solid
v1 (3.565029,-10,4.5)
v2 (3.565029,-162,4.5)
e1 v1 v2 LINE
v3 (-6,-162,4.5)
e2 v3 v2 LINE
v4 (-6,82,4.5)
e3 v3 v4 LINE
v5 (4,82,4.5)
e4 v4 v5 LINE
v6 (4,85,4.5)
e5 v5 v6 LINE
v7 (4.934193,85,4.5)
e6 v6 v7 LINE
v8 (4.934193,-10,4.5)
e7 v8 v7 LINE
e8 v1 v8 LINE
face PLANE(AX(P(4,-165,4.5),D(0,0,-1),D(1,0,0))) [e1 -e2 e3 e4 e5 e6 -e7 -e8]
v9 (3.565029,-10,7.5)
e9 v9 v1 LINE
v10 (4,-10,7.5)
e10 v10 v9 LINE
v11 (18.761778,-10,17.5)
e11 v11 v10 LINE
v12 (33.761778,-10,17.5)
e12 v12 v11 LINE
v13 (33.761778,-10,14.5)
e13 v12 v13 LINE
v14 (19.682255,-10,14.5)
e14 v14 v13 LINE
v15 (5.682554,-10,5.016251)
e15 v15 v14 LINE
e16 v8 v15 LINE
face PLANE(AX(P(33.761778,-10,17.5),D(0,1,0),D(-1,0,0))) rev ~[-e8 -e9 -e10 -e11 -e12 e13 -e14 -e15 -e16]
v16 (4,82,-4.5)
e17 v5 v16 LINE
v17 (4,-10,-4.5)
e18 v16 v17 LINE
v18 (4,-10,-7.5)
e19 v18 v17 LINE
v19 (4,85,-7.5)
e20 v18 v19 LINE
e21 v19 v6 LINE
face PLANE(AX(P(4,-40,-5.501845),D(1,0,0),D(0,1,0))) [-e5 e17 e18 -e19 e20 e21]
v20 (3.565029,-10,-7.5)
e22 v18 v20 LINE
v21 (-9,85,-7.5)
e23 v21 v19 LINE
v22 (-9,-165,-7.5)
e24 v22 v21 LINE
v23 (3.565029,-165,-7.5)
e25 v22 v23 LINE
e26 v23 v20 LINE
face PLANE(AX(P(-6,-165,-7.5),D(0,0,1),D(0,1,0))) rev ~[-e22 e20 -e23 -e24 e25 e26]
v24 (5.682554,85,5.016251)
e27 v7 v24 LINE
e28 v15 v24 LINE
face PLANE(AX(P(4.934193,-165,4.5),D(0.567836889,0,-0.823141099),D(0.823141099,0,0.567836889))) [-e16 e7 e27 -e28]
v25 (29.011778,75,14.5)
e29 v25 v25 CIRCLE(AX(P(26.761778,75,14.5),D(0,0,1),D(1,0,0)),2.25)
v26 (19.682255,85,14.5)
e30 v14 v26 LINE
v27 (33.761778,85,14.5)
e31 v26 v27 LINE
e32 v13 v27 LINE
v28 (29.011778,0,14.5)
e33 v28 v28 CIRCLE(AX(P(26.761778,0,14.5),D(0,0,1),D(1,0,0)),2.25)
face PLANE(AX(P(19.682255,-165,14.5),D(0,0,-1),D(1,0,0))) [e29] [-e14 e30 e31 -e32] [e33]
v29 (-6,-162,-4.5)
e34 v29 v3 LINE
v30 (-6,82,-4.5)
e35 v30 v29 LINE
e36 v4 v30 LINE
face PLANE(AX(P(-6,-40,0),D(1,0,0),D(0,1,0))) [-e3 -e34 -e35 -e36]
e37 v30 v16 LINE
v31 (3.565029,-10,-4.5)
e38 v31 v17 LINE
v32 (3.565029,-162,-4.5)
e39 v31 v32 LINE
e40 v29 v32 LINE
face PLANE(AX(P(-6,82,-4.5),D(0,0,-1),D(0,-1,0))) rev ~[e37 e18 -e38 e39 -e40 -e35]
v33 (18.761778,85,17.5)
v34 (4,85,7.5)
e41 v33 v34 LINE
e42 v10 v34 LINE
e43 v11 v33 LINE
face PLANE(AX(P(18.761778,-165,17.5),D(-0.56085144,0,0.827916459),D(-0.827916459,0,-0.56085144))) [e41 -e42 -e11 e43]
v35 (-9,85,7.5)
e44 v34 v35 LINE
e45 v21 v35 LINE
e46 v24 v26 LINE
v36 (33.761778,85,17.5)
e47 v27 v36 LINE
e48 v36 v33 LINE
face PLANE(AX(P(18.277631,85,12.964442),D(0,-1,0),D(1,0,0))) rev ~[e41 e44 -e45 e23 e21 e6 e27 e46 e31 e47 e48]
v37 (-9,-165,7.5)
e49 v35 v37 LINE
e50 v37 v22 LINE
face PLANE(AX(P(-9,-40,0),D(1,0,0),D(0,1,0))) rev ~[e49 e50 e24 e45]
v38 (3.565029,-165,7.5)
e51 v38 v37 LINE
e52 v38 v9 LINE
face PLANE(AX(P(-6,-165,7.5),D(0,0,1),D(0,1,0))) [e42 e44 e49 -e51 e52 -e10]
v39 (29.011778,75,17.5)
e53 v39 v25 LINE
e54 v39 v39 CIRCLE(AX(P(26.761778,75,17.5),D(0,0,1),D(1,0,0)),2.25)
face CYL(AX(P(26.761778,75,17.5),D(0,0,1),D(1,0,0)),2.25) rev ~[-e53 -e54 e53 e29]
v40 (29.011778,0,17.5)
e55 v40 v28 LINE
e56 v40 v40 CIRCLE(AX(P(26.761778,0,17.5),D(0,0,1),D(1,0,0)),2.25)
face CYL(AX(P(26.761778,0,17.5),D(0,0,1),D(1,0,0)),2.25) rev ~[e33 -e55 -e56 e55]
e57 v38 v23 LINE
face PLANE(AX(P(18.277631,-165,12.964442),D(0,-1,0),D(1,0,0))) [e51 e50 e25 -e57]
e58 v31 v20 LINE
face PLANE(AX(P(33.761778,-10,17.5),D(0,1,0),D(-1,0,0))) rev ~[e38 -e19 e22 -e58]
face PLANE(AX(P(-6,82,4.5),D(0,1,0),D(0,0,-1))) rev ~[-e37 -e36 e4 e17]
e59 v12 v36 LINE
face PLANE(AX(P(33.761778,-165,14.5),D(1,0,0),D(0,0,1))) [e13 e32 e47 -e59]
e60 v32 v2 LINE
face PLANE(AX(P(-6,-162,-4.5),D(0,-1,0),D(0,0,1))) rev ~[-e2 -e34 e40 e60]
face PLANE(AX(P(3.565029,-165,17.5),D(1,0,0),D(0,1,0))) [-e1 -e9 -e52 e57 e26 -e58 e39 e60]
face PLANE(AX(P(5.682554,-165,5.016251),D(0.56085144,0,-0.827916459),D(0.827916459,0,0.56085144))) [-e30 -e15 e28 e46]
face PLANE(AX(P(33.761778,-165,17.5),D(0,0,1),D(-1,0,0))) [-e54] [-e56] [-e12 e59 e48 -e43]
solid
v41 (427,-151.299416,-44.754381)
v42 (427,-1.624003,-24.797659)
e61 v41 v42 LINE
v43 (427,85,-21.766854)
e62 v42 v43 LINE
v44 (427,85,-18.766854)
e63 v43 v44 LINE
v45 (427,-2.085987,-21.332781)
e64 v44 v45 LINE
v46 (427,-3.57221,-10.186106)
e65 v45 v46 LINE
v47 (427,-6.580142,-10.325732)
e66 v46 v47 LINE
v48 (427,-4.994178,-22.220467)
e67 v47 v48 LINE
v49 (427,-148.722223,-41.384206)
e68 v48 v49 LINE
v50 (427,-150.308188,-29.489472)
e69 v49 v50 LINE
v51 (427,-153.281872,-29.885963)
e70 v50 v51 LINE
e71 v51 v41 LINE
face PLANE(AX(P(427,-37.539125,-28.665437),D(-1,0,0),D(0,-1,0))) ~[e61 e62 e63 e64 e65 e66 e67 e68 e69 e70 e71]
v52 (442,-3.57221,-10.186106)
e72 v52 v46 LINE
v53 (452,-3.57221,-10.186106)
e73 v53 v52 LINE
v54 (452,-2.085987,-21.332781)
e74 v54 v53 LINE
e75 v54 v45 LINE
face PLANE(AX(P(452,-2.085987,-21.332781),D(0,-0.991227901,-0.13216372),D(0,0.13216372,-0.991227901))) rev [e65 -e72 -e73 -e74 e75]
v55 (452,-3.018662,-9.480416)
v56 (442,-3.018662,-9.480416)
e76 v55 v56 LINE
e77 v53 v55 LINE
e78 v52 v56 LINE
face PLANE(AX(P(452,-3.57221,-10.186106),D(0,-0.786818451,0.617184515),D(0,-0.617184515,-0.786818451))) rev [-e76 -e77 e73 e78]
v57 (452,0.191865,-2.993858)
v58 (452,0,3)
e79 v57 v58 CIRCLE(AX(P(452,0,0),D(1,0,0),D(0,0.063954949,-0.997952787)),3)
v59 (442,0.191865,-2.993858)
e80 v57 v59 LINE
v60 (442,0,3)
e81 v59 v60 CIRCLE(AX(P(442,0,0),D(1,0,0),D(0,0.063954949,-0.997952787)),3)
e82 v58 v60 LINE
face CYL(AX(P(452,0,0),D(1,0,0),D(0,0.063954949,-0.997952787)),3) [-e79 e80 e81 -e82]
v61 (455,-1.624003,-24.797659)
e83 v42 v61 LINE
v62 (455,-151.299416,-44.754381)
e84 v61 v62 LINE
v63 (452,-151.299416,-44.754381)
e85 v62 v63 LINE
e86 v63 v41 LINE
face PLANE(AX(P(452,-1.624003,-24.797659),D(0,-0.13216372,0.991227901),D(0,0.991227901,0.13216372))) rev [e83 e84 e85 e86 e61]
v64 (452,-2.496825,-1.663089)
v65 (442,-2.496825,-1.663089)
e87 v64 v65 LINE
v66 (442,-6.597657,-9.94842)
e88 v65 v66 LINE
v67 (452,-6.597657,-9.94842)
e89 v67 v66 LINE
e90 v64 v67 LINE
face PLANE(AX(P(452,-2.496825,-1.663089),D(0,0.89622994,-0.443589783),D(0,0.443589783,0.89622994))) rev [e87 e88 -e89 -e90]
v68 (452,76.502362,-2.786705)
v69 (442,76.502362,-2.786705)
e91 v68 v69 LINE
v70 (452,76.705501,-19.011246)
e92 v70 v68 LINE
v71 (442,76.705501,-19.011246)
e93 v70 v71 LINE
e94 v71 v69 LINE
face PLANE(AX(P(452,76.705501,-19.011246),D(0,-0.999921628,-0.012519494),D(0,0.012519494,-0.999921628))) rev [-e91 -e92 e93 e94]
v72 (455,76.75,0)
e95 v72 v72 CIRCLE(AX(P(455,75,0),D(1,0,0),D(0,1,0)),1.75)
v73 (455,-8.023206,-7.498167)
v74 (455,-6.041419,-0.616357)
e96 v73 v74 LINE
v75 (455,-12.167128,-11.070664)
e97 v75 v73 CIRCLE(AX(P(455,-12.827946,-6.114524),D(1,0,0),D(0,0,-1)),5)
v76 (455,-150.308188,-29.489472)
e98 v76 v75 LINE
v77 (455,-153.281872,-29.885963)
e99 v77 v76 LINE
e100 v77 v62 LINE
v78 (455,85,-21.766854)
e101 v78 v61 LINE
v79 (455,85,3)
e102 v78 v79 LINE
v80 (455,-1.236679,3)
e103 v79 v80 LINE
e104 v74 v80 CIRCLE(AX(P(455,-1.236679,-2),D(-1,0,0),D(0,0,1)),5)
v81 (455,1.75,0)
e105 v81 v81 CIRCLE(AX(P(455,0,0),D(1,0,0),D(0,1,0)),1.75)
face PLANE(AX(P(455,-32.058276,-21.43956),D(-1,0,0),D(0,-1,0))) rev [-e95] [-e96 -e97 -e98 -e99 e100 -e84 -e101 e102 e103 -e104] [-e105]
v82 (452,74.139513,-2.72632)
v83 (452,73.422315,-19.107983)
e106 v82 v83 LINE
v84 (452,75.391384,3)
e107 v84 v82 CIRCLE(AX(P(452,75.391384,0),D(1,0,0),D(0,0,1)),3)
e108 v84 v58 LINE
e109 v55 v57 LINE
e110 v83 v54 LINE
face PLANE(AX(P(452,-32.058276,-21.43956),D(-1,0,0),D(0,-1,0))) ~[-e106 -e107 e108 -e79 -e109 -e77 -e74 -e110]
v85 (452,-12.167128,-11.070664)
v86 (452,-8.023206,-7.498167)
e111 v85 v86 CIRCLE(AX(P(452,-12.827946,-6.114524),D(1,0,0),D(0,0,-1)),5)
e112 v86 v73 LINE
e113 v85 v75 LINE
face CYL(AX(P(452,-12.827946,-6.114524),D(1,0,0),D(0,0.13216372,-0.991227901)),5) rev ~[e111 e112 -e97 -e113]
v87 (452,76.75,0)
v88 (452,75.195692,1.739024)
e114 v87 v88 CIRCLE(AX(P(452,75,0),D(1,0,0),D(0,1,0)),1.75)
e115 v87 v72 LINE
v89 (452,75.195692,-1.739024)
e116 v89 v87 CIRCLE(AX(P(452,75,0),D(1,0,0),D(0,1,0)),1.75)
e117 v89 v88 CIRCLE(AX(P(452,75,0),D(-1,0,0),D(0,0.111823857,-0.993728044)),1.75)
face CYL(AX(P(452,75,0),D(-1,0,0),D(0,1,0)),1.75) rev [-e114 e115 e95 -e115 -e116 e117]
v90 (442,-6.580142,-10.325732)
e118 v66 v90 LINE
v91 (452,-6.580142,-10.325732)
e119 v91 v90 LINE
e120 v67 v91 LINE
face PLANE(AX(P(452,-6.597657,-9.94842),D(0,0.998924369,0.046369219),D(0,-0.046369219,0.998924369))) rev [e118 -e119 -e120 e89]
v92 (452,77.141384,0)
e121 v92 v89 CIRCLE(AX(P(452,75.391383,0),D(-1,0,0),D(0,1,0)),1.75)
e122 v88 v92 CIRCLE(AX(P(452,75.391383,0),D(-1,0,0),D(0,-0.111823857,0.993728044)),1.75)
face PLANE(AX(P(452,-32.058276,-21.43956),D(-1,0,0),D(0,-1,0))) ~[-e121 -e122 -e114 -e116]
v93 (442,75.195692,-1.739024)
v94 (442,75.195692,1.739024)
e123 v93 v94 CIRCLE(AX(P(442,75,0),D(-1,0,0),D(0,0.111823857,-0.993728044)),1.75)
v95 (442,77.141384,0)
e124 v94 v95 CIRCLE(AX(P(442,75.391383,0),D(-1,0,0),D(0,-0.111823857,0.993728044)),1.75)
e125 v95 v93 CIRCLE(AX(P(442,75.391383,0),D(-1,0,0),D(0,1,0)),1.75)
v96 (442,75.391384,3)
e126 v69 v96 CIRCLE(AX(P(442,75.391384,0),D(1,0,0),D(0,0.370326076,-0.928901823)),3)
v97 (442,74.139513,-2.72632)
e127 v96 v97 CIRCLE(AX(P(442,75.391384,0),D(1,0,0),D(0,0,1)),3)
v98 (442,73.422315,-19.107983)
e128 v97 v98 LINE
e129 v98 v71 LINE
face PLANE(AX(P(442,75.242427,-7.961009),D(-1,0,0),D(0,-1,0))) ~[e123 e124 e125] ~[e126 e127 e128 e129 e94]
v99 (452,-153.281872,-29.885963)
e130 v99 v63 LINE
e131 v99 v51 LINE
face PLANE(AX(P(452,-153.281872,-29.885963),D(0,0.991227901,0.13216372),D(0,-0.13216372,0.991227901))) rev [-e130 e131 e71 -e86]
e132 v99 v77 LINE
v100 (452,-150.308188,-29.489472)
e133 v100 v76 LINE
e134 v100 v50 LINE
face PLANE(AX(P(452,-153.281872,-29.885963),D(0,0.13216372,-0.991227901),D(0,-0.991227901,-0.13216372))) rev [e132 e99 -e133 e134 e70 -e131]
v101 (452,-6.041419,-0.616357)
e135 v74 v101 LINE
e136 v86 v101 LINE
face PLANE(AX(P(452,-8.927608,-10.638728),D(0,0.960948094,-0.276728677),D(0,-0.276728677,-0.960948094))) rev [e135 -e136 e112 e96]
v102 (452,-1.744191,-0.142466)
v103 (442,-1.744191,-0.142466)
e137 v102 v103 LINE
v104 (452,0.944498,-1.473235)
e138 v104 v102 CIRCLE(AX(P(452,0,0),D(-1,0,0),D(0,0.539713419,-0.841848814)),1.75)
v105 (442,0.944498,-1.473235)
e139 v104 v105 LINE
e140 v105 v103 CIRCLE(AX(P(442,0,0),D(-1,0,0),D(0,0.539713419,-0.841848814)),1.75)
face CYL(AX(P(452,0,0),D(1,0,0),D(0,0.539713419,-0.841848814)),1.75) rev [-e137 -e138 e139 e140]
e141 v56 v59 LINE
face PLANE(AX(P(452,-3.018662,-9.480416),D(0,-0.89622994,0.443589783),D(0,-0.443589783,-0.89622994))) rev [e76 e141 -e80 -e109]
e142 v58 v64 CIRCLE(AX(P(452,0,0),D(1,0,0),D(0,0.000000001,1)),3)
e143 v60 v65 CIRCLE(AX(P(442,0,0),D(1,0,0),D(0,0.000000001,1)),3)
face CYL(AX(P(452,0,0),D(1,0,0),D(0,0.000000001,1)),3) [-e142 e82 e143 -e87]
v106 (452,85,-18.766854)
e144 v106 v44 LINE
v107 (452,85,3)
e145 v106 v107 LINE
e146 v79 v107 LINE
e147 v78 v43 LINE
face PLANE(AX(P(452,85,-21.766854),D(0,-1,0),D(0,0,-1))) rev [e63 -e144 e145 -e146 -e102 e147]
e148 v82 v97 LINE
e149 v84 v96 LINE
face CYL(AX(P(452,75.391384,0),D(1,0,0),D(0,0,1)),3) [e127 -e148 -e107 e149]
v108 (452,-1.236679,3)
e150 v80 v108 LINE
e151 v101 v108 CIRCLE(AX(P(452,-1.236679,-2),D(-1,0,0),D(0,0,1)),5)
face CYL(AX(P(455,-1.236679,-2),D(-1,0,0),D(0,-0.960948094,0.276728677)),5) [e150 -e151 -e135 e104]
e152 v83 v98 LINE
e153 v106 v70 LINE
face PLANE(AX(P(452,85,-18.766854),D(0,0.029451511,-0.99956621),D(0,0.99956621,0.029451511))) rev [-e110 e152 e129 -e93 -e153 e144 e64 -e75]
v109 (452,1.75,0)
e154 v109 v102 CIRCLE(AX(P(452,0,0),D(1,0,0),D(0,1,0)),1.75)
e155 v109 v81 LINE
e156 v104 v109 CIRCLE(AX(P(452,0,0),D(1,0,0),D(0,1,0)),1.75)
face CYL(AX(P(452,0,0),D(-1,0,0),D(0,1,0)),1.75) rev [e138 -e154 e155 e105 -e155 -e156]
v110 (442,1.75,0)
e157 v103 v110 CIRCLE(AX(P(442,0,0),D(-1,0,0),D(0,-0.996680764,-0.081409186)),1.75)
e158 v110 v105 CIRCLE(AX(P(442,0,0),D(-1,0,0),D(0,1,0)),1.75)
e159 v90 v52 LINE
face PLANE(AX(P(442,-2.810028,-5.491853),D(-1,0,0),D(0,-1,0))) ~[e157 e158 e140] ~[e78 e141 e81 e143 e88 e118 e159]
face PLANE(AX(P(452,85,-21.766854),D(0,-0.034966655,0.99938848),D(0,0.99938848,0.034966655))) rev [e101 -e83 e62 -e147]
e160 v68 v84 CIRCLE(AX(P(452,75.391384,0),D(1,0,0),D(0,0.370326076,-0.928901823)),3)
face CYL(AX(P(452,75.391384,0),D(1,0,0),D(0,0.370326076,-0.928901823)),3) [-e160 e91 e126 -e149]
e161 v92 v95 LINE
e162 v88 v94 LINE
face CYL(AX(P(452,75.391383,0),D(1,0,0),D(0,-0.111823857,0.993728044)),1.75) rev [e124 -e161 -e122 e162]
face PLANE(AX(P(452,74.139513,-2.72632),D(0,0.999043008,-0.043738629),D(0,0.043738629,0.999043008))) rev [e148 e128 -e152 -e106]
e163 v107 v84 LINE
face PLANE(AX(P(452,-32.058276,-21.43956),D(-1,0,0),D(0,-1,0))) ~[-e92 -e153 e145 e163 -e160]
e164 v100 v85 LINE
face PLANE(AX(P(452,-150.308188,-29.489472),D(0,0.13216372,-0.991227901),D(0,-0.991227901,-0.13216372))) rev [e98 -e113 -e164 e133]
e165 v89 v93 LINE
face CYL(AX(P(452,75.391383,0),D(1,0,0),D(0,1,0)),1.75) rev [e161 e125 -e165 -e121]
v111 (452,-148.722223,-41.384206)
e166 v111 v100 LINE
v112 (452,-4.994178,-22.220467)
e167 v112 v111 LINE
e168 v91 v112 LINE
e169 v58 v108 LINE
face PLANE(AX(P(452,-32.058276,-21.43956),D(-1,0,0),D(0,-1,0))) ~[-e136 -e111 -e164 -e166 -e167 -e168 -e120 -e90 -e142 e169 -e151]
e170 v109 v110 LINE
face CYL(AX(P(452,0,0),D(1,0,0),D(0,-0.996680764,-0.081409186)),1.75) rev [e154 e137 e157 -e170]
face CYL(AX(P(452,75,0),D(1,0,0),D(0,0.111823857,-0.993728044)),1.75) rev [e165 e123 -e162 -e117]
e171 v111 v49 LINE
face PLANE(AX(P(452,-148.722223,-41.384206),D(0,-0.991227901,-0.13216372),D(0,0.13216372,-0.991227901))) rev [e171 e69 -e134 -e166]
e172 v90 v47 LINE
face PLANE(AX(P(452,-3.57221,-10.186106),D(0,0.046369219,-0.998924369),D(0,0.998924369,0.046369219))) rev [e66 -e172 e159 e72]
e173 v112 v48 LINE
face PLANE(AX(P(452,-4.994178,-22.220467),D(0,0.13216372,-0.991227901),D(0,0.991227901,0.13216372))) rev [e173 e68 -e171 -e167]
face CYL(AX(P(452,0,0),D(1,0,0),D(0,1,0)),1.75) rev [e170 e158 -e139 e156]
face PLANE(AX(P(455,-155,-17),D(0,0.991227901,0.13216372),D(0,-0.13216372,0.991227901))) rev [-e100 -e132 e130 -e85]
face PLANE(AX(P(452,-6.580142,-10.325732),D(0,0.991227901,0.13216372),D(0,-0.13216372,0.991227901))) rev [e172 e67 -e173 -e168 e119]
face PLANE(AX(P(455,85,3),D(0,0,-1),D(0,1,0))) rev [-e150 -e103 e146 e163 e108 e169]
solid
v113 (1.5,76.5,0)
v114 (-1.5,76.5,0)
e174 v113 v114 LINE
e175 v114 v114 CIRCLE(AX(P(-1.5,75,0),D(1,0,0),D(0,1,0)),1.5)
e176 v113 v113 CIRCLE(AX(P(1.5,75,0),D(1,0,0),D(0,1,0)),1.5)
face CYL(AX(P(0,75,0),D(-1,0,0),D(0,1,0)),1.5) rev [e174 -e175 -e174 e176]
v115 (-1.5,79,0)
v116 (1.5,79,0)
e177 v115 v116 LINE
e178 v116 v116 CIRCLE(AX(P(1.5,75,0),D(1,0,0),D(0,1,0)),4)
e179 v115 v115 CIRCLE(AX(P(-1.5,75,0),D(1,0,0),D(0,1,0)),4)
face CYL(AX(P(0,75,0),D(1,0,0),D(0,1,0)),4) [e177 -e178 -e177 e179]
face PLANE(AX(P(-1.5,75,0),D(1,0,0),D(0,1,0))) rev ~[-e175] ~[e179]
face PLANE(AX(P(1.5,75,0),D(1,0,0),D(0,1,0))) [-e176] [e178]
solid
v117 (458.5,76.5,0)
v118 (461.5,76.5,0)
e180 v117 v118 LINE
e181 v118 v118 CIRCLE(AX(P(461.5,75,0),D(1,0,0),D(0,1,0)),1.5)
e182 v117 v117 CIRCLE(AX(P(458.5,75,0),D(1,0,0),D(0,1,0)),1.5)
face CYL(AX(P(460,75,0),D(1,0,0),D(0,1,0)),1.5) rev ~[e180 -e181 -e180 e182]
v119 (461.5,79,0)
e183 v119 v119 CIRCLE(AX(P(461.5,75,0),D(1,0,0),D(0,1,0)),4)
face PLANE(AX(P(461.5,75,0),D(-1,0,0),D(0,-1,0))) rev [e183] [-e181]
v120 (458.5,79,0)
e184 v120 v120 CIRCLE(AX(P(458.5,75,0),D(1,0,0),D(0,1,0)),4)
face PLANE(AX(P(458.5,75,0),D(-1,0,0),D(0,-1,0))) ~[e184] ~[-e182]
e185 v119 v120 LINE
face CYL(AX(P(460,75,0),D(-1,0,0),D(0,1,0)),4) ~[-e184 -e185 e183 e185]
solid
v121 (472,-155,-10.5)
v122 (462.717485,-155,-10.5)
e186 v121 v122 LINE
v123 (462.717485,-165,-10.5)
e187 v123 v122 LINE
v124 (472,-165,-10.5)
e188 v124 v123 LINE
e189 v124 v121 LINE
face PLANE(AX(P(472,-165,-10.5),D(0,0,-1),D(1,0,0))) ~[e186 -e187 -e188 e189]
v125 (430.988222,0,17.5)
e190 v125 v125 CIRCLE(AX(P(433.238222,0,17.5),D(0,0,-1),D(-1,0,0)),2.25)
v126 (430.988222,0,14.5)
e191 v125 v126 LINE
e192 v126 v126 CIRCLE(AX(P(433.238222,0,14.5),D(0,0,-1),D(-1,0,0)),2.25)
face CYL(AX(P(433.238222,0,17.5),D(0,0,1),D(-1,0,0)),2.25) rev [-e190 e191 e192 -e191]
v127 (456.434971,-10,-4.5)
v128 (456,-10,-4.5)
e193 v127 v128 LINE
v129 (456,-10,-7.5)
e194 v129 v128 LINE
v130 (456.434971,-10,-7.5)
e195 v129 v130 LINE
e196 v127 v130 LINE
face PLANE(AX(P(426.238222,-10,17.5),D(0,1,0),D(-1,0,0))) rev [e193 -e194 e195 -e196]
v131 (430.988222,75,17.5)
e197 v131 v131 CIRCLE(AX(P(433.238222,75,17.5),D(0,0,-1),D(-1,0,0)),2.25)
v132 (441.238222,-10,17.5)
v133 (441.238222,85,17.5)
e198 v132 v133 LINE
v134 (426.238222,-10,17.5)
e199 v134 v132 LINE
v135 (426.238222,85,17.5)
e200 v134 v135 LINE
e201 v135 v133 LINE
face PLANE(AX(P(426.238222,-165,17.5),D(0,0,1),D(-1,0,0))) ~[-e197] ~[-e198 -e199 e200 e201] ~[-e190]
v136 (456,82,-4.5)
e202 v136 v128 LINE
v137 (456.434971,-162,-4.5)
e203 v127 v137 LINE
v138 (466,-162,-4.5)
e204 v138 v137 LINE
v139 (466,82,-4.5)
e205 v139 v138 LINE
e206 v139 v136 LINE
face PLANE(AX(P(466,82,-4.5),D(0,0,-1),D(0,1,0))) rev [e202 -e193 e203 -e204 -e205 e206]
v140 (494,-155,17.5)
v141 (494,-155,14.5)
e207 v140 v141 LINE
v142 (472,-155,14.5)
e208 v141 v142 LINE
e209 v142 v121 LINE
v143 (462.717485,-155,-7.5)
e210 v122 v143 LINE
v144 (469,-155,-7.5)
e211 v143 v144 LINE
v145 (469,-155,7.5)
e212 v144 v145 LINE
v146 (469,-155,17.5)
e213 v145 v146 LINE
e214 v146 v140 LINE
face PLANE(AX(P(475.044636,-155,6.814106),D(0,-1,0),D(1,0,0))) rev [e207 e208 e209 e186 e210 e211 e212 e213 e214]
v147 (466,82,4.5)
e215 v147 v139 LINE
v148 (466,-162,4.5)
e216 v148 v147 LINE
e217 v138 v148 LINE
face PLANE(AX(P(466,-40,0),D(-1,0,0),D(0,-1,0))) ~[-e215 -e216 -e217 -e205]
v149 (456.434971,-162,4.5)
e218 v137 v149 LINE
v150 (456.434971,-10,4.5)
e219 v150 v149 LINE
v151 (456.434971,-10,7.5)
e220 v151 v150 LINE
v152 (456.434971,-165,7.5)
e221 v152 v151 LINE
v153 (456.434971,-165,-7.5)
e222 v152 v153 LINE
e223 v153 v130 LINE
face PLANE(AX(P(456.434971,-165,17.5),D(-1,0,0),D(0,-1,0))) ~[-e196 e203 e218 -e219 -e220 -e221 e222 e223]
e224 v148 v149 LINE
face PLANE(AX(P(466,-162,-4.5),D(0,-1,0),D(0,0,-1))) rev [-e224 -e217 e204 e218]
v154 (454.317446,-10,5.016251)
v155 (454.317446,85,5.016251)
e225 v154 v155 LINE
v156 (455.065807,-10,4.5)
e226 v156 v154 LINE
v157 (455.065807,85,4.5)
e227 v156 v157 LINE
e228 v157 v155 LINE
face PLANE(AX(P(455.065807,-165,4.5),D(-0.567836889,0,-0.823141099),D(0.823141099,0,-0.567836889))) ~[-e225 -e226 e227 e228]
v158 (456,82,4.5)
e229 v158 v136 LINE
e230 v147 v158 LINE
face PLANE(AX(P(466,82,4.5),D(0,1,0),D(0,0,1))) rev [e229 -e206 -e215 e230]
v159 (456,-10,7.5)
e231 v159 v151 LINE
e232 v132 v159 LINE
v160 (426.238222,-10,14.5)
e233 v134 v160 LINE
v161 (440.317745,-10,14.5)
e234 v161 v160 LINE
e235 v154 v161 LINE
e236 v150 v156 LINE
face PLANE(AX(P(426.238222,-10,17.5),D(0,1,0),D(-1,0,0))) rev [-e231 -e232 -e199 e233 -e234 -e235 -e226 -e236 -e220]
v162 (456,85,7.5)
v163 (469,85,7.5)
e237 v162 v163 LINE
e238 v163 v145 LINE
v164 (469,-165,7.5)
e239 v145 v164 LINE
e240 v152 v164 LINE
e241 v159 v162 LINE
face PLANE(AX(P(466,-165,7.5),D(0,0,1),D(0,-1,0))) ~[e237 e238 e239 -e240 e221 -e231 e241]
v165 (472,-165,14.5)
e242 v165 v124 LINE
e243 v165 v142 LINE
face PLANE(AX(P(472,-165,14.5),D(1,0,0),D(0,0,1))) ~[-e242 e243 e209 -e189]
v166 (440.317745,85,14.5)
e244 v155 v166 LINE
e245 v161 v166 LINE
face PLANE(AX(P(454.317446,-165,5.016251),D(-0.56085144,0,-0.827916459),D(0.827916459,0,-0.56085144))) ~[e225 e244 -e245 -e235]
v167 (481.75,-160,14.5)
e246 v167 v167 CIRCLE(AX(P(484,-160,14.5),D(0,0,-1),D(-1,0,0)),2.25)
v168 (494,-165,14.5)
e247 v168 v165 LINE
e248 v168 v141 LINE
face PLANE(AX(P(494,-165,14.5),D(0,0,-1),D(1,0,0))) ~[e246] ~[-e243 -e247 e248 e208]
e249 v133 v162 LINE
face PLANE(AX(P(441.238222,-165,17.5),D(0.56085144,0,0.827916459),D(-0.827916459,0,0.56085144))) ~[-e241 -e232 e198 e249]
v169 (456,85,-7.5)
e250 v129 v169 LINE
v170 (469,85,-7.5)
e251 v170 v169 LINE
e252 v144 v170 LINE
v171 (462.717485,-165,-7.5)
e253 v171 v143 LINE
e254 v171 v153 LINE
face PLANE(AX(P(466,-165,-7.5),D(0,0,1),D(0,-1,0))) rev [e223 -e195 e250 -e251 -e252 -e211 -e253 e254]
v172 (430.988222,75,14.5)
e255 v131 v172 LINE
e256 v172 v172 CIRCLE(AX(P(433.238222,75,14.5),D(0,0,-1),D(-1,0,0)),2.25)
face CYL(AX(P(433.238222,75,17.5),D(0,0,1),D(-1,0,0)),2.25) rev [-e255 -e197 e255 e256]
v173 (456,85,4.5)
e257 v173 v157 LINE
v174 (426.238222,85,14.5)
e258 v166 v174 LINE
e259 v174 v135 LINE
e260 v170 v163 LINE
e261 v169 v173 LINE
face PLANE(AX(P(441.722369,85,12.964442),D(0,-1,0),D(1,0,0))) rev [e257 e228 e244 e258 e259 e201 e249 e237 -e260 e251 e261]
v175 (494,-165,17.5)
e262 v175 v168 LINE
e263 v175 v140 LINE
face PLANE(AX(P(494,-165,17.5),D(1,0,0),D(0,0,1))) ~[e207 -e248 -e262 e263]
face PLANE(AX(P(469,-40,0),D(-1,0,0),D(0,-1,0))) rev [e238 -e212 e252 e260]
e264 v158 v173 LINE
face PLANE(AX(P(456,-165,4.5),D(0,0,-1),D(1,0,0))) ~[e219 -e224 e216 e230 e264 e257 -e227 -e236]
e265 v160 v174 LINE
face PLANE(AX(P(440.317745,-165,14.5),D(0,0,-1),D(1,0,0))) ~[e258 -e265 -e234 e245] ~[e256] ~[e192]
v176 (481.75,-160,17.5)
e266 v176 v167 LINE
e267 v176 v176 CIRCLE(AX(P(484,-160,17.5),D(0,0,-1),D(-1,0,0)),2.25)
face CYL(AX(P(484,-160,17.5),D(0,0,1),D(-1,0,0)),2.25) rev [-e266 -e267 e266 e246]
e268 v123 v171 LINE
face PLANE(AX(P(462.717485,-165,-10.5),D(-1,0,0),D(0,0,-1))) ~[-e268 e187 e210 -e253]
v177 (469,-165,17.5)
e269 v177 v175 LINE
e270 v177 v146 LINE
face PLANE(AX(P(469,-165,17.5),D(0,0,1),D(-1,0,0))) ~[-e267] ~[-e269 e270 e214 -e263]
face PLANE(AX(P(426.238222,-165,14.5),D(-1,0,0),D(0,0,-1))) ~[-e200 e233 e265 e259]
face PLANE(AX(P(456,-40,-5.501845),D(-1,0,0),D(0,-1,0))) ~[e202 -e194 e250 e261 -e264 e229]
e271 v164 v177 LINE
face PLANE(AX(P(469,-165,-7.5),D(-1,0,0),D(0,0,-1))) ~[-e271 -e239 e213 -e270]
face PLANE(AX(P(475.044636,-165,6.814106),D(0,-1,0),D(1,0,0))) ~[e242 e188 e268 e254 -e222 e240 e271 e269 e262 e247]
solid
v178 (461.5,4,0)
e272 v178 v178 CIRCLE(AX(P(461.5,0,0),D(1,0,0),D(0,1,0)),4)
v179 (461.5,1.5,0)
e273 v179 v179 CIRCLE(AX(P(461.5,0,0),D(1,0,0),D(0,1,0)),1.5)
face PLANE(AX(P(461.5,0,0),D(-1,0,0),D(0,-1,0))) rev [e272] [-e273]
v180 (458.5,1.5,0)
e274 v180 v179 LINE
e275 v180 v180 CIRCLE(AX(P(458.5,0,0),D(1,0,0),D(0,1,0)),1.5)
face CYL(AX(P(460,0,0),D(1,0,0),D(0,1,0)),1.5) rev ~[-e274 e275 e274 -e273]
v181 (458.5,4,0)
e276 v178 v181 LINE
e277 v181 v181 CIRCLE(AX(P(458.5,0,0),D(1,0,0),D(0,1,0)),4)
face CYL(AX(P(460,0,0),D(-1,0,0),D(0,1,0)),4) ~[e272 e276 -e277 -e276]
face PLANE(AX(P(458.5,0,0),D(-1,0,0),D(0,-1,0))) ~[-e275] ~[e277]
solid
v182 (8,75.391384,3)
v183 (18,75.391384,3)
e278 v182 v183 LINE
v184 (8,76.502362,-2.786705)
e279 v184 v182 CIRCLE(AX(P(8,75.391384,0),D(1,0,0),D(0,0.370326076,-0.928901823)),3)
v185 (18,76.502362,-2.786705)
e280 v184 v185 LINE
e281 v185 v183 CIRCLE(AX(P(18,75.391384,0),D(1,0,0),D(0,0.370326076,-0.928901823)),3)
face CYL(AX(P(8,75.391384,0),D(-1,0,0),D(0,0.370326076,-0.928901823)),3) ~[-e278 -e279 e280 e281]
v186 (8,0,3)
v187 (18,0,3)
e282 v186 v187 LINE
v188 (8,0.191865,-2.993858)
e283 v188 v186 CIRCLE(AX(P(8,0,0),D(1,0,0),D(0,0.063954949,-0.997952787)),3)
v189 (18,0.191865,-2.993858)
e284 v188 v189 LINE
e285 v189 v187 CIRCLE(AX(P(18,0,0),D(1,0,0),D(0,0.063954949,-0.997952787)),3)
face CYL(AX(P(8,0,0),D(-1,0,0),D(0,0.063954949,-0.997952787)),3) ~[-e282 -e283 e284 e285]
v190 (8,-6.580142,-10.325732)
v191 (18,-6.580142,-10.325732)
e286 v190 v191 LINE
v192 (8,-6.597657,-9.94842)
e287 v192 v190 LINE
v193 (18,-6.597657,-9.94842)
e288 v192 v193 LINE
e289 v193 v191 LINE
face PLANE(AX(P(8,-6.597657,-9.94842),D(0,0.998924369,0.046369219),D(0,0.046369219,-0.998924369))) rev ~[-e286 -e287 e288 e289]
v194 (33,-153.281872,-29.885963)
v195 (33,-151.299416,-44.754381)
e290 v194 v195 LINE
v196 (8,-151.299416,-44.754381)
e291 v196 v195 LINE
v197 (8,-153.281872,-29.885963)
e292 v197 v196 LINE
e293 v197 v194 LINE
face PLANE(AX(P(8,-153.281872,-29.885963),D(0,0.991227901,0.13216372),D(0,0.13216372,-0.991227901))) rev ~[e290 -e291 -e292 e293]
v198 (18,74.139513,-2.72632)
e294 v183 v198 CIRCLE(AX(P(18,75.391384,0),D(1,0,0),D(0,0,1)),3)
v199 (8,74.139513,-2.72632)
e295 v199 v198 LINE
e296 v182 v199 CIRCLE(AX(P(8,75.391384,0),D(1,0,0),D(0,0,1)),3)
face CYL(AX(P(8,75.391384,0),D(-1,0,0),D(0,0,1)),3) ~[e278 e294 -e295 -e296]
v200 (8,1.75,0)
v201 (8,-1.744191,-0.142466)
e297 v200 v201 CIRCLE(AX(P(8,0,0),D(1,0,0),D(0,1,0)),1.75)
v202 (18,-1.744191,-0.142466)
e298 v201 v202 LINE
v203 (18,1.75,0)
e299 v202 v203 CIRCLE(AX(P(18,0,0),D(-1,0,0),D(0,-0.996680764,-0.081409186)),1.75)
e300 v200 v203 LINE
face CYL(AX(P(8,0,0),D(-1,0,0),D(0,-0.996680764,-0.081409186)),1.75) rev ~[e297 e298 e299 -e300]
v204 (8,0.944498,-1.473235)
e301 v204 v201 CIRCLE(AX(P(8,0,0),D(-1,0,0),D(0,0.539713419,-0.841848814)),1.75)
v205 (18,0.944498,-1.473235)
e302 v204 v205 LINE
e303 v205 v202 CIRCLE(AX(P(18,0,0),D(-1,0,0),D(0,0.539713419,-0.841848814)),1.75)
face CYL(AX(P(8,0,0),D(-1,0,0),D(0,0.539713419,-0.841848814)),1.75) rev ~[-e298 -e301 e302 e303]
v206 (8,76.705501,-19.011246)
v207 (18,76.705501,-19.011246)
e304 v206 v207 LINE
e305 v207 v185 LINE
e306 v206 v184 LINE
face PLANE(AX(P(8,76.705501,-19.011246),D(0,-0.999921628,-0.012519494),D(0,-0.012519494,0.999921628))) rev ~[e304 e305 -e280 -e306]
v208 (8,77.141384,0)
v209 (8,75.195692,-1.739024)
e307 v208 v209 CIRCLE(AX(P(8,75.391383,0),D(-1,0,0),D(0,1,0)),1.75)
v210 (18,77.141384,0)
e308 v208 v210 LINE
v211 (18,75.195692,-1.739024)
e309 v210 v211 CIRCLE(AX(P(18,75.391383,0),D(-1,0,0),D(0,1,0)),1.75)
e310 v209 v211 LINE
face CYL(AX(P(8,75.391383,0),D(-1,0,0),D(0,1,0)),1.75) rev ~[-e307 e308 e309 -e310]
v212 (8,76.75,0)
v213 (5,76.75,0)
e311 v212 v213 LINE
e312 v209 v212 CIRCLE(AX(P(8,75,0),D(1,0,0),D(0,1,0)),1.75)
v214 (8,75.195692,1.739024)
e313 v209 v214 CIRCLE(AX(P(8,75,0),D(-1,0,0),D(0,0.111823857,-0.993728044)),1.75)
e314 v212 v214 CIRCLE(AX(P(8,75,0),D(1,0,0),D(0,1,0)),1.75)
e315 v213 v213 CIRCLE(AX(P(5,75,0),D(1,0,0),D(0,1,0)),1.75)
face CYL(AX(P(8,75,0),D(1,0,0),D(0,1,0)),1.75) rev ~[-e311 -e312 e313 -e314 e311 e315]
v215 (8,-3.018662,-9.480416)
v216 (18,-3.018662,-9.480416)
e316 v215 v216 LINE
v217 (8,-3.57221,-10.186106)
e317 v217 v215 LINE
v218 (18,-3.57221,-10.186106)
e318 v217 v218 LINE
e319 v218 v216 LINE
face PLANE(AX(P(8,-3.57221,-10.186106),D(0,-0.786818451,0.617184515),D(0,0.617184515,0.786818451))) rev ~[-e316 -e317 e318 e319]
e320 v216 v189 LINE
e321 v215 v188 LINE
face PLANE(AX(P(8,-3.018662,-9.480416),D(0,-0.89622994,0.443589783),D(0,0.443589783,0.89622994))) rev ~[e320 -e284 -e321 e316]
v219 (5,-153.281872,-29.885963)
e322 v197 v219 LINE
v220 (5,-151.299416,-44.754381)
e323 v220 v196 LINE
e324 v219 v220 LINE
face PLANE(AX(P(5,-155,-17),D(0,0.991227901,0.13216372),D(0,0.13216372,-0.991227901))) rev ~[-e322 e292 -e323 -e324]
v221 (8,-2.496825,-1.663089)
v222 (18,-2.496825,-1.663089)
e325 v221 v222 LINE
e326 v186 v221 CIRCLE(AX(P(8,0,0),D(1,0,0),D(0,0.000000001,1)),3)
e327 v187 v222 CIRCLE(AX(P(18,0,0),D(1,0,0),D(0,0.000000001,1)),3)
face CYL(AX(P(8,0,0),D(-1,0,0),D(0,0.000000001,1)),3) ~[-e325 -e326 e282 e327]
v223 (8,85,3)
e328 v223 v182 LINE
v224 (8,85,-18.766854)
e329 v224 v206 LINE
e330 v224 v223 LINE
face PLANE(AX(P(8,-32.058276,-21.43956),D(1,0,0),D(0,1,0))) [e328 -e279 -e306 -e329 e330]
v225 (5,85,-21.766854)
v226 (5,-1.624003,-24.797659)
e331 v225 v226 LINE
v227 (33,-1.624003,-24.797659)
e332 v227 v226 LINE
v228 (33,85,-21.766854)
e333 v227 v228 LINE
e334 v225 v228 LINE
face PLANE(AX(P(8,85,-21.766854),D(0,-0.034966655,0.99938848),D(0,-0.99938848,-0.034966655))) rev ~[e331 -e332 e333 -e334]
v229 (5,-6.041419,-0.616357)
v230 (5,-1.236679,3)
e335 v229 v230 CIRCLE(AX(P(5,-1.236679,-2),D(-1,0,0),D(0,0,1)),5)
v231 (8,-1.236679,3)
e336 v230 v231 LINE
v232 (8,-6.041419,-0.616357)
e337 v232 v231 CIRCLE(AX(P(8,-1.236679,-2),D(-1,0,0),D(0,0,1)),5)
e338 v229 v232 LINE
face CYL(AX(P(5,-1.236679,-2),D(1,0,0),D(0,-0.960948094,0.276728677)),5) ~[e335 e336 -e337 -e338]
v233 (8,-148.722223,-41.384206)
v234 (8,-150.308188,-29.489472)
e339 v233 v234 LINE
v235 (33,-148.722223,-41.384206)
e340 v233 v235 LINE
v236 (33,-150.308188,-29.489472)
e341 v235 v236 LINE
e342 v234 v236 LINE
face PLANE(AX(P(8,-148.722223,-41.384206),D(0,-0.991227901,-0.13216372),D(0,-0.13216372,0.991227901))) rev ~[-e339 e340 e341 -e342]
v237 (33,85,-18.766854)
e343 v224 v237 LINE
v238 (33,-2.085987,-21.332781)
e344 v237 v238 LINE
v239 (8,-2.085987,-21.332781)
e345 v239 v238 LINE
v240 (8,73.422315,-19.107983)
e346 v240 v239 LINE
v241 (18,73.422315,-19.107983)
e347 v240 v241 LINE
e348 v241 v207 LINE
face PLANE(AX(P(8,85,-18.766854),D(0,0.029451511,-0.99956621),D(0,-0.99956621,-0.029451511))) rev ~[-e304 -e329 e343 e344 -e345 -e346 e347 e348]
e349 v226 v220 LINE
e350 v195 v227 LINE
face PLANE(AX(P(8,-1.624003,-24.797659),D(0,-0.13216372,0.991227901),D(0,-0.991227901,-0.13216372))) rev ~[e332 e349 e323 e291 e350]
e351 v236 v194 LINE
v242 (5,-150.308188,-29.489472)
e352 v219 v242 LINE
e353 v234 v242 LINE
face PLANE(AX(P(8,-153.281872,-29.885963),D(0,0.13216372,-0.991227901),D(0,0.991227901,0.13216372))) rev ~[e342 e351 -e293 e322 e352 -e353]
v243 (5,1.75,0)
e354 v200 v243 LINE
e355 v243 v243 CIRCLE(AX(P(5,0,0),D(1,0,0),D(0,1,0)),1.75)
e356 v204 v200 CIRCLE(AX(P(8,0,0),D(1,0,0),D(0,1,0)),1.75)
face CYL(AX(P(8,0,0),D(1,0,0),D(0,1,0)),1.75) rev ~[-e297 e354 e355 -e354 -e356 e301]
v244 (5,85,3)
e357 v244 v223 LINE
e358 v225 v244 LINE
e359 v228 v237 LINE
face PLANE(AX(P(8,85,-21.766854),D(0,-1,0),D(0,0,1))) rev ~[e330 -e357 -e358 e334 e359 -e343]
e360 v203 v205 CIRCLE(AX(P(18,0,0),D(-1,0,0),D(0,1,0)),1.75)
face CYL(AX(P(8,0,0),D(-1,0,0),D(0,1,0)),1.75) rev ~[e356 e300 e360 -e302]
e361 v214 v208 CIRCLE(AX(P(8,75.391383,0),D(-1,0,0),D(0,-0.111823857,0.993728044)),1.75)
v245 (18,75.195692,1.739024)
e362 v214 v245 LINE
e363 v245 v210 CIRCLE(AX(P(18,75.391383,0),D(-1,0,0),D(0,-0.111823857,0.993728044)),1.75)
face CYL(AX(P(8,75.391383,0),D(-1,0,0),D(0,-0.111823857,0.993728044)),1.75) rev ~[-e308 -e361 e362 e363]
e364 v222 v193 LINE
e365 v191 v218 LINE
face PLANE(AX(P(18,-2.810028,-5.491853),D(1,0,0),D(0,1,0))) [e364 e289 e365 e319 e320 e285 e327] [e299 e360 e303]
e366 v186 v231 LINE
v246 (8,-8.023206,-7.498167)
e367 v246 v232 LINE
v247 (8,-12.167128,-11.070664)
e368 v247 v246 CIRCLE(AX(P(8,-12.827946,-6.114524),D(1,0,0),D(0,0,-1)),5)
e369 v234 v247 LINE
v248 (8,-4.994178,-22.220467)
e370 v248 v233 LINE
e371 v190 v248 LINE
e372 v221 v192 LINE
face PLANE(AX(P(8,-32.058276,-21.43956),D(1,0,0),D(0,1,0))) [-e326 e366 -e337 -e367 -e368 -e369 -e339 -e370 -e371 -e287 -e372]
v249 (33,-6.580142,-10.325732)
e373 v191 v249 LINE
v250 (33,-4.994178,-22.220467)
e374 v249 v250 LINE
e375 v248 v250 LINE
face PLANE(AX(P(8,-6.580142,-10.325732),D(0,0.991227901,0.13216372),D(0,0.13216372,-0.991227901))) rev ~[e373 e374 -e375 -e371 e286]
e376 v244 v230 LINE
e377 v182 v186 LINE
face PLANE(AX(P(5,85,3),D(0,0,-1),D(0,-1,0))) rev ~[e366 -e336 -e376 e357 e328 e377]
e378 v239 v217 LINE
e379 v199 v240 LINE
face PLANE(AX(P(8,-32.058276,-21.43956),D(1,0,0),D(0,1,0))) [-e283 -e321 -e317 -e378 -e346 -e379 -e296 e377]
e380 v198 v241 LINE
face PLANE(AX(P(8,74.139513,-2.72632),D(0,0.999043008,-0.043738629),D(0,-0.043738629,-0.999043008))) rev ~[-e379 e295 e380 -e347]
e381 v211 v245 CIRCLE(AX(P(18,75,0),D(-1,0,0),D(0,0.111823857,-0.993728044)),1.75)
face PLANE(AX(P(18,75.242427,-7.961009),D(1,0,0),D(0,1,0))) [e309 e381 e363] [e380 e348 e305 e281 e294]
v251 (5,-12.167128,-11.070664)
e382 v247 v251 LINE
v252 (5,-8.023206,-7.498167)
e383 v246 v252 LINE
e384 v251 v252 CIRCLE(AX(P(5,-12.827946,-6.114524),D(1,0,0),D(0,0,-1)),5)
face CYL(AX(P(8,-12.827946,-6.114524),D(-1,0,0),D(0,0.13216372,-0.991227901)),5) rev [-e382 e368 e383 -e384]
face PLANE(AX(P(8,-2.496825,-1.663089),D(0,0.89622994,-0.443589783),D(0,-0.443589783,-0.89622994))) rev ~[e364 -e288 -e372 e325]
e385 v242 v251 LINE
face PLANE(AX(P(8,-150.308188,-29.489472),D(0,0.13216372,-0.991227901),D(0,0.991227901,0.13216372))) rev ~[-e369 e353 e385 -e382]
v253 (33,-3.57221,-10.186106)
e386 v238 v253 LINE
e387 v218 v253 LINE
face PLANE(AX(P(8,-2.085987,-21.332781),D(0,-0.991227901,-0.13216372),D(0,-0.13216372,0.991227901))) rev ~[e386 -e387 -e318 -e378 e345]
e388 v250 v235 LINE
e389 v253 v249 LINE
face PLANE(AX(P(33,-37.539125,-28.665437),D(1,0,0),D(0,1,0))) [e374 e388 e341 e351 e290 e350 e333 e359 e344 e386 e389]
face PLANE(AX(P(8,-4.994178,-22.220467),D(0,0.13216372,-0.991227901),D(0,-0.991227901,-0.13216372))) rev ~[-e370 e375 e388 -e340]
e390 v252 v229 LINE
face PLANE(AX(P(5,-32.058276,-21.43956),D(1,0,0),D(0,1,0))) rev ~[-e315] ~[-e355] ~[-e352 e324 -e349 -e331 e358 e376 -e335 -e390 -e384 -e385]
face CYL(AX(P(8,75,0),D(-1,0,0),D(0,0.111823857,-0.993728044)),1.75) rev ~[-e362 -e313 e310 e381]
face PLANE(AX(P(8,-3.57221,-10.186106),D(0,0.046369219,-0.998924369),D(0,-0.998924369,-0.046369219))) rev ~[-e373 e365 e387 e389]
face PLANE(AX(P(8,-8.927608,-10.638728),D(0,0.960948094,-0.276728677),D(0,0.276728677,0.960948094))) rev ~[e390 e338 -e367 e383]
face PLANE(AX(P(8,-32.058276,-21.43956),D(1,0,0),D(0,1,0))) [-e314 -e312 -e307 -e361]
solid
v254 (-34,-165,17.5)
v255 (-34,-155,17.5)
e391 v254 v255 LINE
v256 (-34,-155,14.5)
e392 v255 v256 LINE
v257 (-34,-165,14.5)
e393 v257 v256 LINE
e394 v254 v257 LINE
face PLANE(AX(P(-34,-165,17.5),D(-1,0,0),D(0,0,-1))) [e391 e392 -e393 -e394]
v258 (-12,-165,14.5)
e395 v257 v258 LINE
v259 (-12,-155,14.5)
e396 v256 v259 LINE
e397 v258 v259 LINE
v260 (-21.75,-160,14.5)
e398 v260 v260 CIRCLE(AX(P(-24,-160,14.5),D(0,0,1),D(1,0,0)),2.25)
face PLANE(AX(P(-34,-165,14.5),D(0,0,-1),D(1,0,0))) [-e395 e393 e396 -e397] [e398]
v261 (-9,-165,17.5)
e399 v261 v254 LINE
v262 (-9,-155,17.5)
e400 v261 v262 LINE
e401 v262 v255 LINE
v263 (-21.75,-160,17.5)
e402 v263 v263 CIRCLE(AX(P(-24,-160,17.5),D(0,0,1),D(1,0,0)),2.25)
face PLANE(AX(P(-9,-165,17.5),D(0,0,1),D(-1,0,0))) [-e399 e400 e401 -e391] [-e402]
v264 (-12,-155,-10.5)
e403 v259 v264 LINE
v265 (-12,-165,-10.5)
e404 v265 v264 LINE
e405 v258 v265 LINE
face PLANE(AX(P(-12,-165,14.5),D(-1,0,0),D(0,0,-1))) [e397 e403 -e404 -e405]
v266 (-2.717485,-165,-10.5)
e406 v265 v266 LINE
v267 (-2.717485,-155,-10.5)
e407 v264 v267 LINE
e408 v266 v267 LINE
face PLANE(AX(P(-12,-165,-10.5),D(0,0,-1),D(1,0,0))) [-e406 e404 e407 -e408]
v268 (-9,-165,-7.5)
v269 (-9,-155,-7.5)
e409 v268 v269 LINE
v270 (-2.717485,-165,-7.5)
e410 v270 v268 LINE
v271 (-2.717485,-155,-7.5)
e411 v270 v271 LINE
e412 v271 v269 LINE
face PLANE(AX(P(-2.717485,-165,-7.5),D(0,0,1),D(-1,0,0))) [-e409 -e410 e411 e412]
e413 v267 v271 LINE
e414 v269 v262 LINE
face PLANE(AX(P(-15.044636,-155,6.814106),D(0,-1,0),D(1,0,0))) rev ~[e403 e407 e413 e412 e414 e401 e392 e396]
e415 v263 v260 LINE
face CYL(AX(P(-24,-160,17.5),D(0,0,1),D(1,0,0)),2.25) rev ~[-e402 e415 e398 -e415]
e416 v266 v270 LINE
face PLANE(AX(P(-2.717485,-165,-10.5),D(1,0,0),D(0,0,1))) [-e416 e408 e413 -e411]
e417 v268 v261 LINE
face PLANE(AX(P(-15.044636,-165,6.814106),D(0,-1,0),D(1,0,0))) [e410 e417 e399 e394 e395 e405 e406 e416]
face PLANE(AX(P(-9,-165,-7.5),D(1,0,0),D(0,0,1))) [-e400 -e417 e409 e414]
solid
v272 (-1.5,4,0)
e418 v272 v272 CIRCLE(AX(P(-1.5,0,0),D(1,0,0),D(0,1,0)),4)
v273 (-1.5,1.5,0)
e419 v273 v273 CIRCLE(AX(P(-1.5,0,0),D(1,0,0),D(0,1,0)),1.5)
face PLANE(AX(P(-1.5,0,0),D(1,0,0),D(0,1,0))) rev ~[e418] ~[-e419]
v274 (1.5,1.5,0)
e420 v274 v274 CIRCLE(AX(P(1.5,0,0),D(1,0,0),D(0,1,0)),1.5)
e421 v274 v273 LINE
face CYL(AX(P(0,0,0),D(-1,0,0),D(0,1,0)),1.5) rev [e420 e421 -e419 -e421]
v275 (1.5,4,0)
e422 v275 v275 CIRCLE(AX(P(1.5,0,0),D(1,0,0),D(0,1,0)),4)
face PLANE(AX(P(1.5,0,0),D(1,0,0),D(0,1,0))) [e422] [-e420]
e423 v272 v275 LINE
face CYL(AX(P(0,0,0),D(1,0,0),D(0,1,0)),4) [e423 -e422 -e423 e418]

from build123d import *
from build123d import SkipClean  # not in build123d's __all__

# Parameters (mm, degrees)
F0_R      = 4
F0_R_2    = 1.5
F1_DEPTH  = 1.5
F4_DEPTH  = 3
F5_W      = 250
F5_H      = 3
F6_DEPTH  = 10
F8_DEPTH  = 10
F11_DEPTH = 3
F12_R     = 1.75
F13_DEPTH = 3
F15_DEPTH = 25
F19_DEPTH = 10
F24_DEPTH = 3
F27_DEPTH = 250
F28_R     = 2.25
F29_DEPTH = 3
F30_W     = 15.1967487764
F30_H     = 155
F31_DEPTH = 25.001
F36_DEPTH = 3
F37_R     = 5
F40_DEPTH = 10
F41_R     = 2.25
F42_DEPTH = 3


# Not quite as in the source:
# - after a boolean that leaves OpenCascade's solid faulty, fix() repairs it


with BuildPart() as f1:
    # F0 (on Right) → F1 (new body, symmetric)
    with BuildSketch(Plane.YZ):
        Circle(F0_R)
        Circle(F0_R_2, mode=Mode.SUBTRACT)
    extrude(amount=F1_DEPTH, both=True)


with BuildPart() as f1b:
    # F0 (on Right) → F1, piece 2 (new body, symmetric)
    with BuildSketch(Plane.YZ):
        with Locations((75, 0)):
            Circle(F0_R)
        with Locations((75, 0)):
            Circle(F0_R_2, mode=Mode.SUBTRACT)
    extrude(amount=F1_DEPTH, both=True)


with BuildPart() as f4:
    # F3 (on offset) → F4 (new body)
    with BuildSketch(Plane.YZ.offset(-9)):
        Polygon((85, -7.5), (85, 0), (85, 7.5), (-165, 7.5), (-165, -7.5), align=None)
    extrude(amount=F4_DEPTH)

    # F5 (on face) → F6 (join)
    with BuildSketch(Plane.YZ.offset(-6)):
        with Locations((-40, 6)):
            Rectangle(F5_W, F5_H)
    extrude(amount=F6_DEPTH)

    # F7 (on face) → F8 (join)
    with BuildSketch(Plane.YZ.offset(-6)):
        Polygon((-162, 4.5), (-165, 4.5), (-165, -7.5), (85, -7.5), (85, 4.5), (82, 4.5), (82, -4.5), (-162, -4.5), align=None)
    extrude(amount=F8_DEPTH)


with BuildPart() as f11:
    # F10 (on offset) → F11 (new body)
    with BuildSketch(Plane.YZ.offset(5)):
        Polygon((85, -34.7448789892), (85, 3), (-5, 3), (-155, -17), (-151.2994158375, -44.7543812191), align=None)
    extrude(amount=F11_DEPTH)

    # F12 (on face) → F13 (cut, through all)
    with BuildSketch(Plane.YZ.offset(8)):
        Circle(F12_R)
        with Locations((75, 0)):
            Circle(F12_R)
    extrude(amount=-F13_DEPTH, mode=Mode.SUBTRACT)

    # F14 (on face) → F15 (join)
    with BuildSketch(Plane.YZ.offset(8)):
        Polygon((-153.2818716388, -29.8859627089), (-151.2994158375, -44.7543812191), (-1.6240028344, -24.7976594854), (85, -21.7668544501), (85, -18.7668544501), (-2.0859865714, -21.3327814575), (-3.5722099029, -10.1861064713), (-6.5801423378, -10.3257321354), (-4.9941776967, -22.2204669436), (-148.7222232957, -41.3842063568), (-150.3081879368, -29.4894715486), align=None)
    extrude(amount=F15_DEPTH)


with BuildPart() as f17_1:
    # F17: instance of F4
    add(f4.part.mirror(Plane.YZ.offset(230)), clean=False)


with BuildPart() as f17_2:
    # F17: instance of F11
    add(f11.part.mirror(Plane.YZ.offset(230)), clean=False)


with BuildPart() as f17_3:
    # F17: instance of F1
    add(f1.part.mirror(Plane.YZ.offset(230)), clean=False)


with BuildPart() as f17_4:
    # F17: instance of F1b
    add(f1b.part.mirror(Plane.YZ.offset(230)), clean=False)


with BuildPart() as f11_1:
    add(f11.part, clean=False)

    # F18 (on face) → F19 (join)
    with BuildSketch(Plane.YZ.offset(8)):
        with BuildLine():
            Line((0.1918648467, -2.9938583601), (0.9444984824, -1.4732354248))
            ThreePointArc((0.9444984824, -1.4732354248), (-0.7762821201, -1.5684023942), (-1.7441913362, -0.142466076))
            Line((-1.7441913362, -0.142466076), (-2.4968249719, -1.6630890114))
            Line((-2.4968249719, -1.6630890114), (-6.5976568338, -9.9484202638))
            Line((-6.5976568338, -9.9484202638), (-6.5801423378, -10.3257321354))
            Line((-6.5801423378, -10.3257321354), (-3.5722099029, -10.1861064713))
            Line((-3.5722099029, -10.1861064713), (-3.0186622242, -9.4804155204))
            Line((-3.0186622242, -9.4804155204), (0.1918648467, -2.9938583601))
        make_face()
        with BuildLine():
            ThreePointArc((1.75, 0), (1.5354758781, -0.83953191), (0.9444984824, -1.4732354248))
            Line((0.9444984824, -1.4732354248), (0.1918648467, -2.9938583601))
            ThreePointArc((0.1918648467, -2.9938583601), (2.998464197, 0.0959815585), (2.1e-09, 3))
            ThreePointArc((2.1e-09, 3), (-2.6447369462, 1.4161096305), (-2.4968249719, -1.6630890114))
            Line((-2.4968249719, -1.6630890114), (-1.7441913362, -0.142466076))
            ThreePointArc((-1.7441913362, -0.142466076), (-0.0712922215, 1.748547231), (1.75, 0))
        make_face()
        with BuildLine():
            ThreePointArc((76.502361728, -2.7867054701), (78.3375773506, 0.565633976), (75.3913835001, 3))
            ThreePointArc((75.3913835001, 3), (72.4606020485, 0.6407184118), (74.1395130754, -2.7263199445))
            Line((74.1395130754, -2.7263199445), (73.4223152522, -19.1079827435))
            Line((73.4223152522, -19.1079827435), (76.70550069, -19.0112460064))
            Line((76.70550069, -19.0112460064), (76.502361728, -2.7867054701))
        make_face()
        with BuildLine():
            ThreePointArc((75.19569175, 1.7390240766), (76.5575823333, 1.3047912788), (77.1413835001, 0))
            ThreePointArc((77.1413835001, 0), (76.5575823333, -1.3047912788), (75.19569175, -1.7390240766))
            ThreePointArc((75.19569175, -1.7390240766), (73.25, 0), (75.19569175, 1.7390240766))
        make_face(mode=Mode.SUBTRACT)
    with SkipClean():  # cleaning this boolean's faces spoils the solid; the shape is the same uncleaned
        extrude(amount=F19_DEPTH)


with BuildPart() as f21_1:
    # F21: instance of F11
    add(f11_1.part.mirror(Plane.YZ.offset(230)), clean=False)


with BuildPart() as f11_2:
    add(f11_1.part, clean=False)

    # F23 (on face) → F24 (cut, through all)
    with BuildSketch(Plane.YZ.offset(8)):
        Polygon((-1.6240028344, -24.7976594854), (-151.2994158375, -44.7543812191), (85, -34.7448789892), (85, -21.7668544501), align=None)
    extrude(amount=-F24_DEPTH, mode=Mode.SUBTRACT)

    add(f11_2.part.fix(), mode=Mode.REPLACE)


with BuildPart() as f25_1:
    # F25: instance of F11
    add(f11_2.part.mirror(Plane.YZ.offset(230)), clean=False)


with BuildPart() as f4_1:
    add(f4.part, clean=False)

    # F26 (on face) → F27 (join)
    with BuildSketch(Plane.XZ.offset(165)):
        Polygon((18.7617782503, 17.5), (4, 7.5), (4, 4.5), (4.9341931008, 4.5), (5.6825543195, 5.0162506242), (19.6822548463, 14.5), (33.7617782503, 14.5), (33.7617782503, 17.5), align=None)
    extrude(amount=-F27_DEPTH)

    # F28 (on face) → F29 (cut, through all)
    with BuildSketch(Plane.XY.offset(17.5)):
        with Locations((26.7617782503, 75)):
            Circle(F28_R)
        with Locations((26.7617782503, 0)):
            Circle(F28_R)
    extrude(amount=-F29_DEPTH, mode=Mode.SUBTRACT)


with BuildPart() as f31_tool:
    # F30 (on face) → F31 (new body, through all)
    with BuildSketch(Plane.XY.offset(17.5)):
        Polygon((33.7617782503, -10), (26.7617782503, -10), (18.7617782503, -10), (18.7617782503, -165), (33.7617782503, -165), align=None)
        with Locations((11.1634038622, -87.5)):
            Rectangle(F30_W, F30_H)
    extrude(amount=-F31_DEPTH)


with BuildPart() as f4_2:
    add(f4_1.part, clean=False)

    # F31: cut by f31_tool
    add(f31_tool.part, mode=Mode.SUBTRACT)


with BuildPart() as f11_3:
    add(f11_2.part, clean=False)

    # F31: cut by f31_tool
    add(f31_tool.part, mode=Mode.SUBTRACT)

    # F35 (on face) → F36 (cut, through all)
    with BuildSketch(Plane.YZ.offset(8)):
        Polygon((-155, -17), (-153.2818716388, -29.8859627089), (-150.3081879368, -29.4894715486), (-8.9276075771, -10.6387275006), (-5, 3), (-10, 2.3333333333), (-10, -7.501), (-83.7575, -7.501), align=None)
    extrude(amount=-F36_DEPTH, mode=Mode.SUBTRACT)

    # F37
    f37_edges = [f11_3.edges().sort_by_distance(p)[0] for p in [
        (6.5, -8.927608, -10.638728),
        (6.5, -5, 3),
    ]]
    fillet(f37_edges, radius=F37_R)


with BuildPart() as f33_1:
    # F33: instance of F4
    add(f4_2.part.mirror(Plane.YZ.offset(230)), clean=False)

    # F43: F40 across plane


with BuildPart() as f38_1:
    # F38: instance of F11
    add(f11_3.part.mirror(Plane.YZ.offset(230)), clean=False)


with BuildPart() as f40:
    # F39 (on face) → F40 (new body)
    with BuildSketch(Plane.XZ.offset(165)):
        Polygon((-2.717485263, -10.5), (-2.717485263, -7.5), (-9, -7.5), (-9, 7.5), (-9, 17.5), (-34, 17.5), (-34, 14.5), (-12, 14.5), (-12, -10.5), align=None)
    extrude(amount=-F40_DEPTH)

    # F41 (on face) → F42 (cut, through all)
    with BuildSketch(Plane.XY.offset(17.5)):
        with Locations((-24, -160)):
            Circle(F41_R)
    extrude(amount=-F42_DEPTH, mode=Mode.SUBTRACT)


with BuildPart() as f33_1_1:
    add(f33_1.part, clean=False)
    add(f40.part.mirror(Plane.YZ.offset(230)), clean=False)


solid = Compound([f1.part, f1b.part, f17_3.part, f17_4.part, f4_2.part, f11_3.part, f38_1.part, f40.part, f33_1_1.part])
